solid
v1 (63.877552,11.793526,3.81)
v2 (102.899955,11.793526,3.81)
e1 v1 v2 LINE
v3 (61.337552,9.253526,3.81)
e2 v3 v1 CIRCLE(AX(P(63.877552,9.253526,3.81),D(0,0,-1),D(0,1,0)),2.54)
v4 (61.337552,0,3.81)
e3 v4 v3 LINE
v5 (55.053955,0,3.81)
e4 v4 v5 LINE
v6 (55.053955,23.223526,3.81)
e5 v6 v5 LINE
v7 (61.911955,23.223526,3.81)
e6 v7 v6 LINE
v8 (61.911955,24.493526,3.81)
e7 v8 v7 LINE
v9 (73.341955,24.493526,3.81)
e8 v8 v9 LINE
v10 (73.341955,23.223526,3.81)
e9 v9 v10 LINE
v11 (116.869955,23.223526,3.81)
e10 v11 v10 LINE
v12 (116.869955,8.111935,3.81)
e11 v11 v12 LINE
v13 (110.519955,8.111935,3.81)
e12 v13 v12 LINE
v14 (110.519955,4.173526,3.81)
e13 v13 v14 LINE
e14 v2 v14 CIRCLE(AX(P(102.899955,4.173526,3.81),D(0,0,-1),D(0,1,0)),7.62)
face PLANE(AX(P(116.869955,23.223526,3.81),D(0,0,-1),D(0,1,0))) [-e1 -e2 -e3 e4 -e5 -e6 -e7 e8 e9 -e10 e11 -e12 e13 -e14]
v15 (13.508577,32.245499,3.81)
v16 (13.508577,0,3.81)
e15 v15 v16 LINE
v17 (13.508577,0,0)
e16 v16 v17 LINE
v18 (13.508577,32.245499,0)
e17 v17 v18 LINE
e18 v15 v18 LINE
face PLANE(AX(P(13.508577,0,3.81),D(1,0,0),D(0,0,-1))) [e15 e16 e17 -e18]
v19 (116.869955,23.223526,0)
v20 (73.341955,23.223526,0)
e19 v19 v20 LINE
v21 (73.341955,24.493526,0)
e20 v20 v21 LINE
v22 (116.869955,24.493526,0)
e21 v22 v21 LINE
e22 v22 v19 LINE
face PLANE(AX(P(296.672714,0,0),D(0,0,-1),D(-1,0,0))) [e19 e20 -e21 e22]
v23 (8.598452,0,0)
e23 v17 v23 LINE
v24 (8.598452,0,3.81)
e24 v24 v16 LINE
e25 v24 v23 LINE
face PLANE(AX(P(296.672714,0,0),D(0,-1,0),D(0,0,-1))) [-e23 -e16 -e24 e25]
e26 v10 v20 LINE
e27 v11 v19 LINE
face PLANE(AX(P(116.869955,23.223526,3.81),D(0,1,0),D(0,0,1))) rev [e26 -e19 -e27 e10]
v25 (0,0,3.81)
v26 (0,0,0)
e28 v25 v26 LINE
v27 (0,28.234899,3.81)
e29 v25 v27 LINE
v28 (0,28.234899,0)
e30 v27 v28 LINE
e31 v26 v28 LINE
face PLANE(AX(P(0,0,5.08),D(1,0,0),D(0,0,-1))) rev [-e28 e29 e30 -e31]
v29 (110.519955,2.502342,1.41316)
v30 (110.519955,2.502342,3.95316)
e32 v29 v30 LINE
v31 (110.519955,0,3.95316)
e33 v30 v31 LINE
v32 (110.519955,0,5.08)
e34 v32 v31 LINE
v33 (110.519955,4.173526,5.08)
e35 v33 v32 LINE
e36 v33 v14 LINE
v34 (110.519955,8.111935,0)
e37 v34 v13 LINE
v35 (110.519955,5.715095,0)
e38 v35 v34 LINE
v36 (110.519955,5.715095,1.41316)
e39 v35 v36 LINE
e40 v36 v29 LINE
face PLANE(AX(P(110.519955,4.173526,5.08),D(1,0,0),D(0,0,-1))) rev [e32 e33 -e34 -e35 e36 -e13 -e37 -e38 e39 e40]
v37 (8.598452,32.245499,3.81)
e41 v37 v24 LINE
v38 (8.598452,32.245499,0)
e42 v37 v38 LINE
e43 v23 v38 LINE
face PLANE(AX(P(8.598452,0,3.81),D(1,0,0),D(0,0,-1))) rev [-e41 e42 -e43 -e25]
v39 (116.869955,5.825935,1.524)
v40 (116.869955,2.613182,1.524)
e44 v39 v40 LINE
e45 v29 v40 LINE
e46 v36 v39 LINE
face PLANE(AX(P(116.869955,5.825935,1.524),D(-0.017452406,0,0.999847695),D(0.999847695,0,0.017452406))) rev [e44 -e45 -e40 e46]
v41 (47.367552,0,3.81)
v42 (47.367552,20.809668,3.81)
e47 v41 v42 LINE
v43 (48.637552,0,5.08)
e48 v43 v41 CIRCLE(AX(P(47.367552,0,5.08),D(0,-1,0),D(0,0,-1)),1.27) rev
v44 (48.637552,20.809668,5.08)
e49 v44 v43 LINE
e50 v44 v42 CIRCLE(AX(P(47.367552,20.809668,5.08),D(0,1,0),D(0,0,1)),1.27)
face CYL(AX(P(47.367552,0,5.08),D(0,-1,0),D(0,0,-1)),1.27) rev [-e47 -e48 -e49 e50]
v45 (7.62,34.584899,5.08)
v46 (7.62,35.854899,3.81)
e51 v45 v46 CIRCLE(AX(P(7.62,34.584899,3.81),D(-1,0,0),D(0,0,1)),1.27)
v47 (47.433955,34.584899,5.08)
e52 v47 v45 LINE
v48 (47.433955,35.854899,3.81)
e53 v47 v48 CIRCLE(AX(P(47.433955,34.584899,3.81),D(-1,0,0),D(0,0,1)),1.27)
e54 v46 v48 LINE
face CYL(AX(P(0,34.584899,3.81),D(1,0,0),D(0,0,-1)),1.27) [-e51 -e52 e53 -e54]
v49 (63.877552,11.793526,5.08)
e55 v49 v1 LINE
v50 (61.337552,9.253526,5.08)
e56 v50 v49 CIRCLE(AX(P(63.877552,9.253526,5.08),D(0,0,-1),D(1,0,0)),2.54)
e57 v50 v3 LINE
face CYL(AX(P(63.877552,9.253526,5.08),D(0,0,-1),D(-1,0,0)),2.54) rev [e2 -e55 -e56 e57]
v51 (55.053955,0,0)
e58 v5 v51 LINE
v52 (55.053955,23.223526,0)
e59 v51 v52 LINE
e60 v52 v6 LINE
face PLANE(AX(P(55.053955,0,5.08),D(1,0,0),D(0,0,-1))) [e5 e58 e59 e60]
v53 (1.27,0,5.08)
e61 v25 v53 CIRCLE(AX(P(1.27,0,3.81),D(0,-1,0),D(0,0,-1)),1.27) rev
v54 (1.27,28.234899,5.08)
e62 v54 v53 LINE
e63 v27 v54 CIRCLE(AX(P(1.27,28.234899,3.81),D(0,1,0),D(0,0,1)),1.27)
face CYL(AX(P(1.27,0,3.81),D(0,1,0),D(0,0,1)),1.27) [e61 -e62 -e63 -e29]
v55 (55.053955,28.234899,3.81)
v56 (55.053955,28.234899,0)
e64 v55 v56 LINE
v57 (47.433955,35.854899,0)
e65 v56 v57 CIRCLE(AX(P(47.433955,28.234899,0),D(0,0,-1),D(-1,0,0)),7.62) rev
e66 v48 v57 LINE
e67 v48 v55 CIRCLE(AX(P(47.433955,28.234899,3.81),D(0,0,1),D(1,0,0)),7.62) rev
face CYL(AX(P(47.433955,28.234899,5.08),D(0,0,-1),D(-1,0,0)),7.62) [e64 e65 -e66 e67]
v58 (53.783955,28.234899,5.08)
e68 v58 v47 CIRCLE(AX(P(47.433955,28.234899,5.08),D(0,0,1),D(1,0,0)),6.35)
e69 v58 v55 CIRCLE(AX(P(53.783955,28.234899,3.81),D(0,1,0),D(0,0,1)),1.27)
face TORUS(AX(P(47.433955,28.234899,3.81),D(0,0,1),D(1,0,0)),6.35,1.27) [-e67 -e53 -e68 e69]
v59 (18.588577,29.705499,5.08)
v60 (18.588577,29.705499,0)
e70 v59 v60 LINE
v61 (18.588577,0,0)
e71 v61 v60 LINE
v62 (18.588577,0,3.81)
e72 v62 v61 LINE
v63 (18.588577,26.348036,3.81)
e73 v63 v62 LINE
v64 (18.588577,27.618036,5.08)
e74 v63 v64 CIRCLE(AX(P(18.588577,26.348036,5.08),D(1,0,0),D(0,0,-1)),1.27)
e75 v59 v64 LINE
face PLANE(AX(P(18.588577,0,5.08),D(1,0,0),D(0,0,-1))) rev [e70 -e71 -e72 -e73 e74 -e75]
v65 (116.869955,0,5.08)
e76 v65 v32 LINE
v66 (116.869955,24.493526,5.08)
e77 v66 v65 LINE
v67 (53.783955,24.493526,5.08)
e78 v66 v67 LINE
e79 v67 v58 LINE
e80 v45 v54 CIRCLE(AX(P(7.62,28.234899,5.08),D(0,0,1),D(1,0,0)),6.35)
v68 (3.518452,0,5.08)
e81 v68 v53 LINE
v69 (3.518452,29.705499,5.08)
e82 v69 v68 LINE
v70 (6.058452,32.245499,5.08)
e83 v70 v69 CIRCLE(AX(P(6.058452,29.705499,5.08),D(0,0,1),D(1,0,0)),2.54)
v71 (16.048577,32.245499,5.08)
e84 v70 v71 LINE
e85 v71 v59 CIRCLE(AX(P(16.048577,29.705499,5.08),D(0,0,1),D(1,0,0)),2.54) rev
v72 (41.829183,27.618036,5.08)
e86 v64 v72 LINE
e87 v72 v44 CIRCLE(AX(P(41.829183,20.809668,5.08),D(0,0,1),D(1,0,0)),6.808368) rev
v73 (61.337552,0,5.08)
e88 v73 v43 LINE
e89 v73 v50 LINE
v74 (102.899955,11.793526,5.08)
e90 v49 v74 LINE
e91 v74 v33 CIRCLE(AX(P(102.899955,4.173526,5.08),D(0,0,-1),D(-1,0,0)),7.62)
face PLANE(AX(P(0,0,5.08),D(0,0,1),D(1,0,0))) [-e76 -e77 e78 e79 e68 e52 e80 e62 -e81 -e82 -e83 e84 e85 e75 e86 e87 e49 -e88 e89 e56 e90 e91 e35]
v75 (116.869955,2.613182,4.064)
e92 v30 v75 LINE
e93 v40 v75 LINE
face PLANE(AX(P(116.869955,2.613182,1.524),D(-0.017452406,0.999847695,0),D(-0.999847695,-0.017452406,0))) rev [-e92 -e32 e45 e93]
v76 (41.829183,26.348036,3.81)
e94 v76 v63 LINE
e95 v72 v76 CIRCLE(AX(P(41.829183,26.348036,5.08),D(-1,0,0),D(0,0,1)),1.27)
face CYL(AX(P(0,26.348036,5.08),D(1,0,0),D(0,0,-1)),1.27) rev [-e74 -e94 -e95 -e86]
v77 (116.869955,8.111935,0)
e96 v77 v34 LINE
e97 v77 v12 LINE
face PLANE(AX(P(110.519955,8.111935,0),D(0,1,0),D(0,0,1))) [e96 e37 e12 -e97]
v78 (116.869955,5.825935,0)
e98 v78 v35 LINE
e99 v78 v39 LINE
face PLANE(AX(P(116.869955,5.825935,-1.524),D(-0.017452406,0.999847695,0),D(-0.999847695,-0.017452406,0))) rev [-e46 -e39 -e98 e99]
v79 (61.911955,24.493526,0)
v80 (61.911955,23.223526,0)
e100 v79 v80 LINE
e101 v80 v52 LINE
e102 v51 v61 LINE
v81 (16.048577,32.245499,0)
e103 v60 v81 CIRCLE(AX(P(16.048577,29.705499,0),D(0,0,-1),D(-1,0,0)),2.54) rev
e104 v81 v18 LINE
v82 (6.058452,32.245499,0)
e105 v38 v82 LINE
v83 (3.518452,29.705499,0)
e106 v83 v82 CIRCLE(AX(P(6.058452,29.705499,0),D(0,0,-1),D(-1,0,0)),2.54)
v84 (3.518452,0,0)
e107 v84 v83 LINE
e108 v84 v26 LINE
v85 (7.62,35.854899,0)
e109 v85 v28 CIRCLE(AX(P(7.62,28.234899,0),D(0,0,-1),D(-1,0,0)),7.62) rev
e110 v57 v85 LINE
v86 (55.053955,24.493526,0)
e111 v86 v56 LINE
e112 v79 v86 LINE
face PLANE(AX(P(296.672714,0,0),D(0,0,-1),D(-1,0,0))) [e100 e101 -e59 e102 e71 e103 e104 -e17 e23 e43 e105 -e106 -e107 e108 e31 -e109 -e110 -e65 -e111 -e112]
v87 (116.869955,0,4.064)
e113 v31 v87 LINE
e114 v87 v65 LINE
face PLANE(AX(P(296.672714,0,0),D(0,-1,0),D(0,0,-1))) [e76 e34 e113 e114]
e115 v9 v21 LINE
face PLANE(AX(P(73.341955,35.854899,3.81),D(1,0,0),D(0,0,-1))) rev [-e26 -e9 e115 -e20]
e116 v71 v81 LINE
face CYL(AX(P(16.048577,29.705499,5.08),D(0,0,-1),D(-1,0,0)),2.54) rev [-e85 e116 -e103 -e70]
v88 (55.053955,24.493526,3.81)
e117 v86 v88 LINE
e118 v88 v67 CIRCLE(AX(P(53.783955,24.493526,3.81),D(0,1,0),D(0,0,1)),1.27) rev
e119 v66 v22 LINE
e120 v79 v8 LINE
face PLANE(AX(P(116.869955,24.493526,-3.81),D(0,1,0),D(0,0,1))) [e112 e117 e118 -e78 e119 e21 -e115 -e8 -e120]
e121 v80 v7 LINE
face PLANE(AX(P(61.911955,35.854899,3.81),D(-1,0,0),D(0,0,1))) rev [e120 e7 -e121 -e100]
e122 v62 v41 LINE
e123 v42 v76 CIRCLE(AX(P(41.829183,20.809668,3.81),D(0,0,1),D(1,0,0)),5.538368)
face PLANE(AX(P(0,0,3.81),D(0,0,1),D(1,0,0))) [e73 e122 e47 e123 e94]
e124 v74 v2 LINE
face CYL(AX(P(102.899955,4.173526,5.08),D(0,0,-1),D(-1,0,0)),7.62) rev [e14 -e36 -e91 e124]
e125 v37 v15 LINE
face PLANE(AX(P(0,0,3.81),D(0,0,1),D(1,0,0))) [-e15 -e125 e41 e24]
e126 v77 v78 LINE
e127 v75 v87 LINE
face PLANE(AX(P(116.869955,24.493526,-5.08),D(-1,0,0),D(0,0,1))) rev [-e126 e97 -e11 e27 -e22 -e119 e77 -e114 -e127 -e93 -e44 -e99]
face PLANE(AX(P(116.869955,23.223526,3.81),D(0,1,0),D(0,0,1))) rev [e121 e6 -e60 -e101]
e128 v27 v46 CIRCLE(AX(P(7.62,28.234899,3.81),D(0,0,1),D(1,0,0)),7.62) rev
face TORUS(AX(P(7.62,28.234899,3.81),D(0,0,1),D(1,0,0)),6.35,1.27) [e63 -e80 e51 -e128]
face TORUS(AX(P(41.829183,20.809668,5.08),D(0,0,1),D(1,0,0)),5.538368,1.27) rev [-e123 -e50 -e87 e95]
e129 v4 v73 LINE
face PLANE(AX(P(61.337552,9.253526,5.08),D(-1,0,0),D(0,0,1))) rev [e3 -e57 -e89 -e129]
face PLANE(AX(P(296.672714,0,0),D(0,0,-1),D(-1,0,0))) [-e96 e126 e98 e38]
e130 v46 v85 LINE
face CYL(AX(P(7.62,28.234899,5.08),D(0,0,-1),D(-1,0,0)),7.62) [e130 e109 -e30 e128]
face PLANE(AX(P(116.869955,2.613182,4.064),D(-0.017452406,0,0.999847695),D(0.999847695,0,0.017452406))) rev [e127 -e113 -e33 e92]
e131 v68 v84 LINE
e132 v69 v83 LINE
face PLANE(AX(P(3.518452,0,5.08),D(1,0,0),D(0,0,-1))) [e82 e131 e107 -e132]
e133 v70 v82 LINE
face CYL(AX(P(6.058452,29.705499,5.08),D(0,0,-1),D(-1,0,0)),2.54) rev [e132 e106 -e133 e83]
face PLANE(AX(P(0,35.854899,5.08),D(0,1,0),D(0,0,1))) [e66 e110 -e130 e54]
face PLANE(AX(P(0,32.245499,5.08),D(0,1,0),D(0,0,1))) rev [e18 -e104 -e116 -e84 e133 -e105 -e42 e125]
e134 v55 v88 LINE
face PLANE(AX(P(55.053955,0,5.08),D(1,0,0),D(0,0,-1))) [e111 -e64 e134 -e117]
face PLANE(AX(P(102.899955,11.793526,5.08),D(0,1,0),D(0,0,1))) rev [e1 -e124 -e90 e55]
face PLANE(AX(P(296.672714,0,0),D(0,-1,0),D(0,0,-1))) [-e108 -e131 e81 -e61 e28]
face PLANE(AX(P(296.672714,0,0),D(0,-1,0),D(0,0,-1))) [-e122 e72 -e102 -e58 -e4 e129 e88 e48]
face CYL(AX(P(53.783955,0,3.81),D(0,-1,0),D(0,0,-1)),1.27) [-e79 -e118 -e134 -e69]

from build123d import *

# Parameters (mm, degrees)
EXTRUDE1_DEPTH           = 5.08
EXTRUDE2_DEPTH           = 1.27
EXTRUDE3_DEPTH           = 3.81
SKETCH1_5_W              = 4.91012523
SKETCH1_5_H              = 32.245498845
EXTRUDE4_DEPTH           = 3.81
FILLET2_R                = 1.27
FILLET3_R                = 1.27
SKETCH3_W                = 7.62
SKETCH3_H                = 71.709798158
CUT_EXTRUDE1_DEPTH       = 69.436
EXTRUDE_THIN4_DEPTH      = 61.816
EXTRUDE_THIN4_DEPTH_BACK = 5.08
SKETCH3_4_W              = 10.16
SKETCH3_4_H              = 48.987051728
SKETCH3_4_W_2            = 7.62
SKETCH3_4_H_2            = 46.447051728
CUT_EXTRUDE2_DEPTH       = 132.052100446
CUT_EXTRUDE2_DEPTH_BACK  = 132.052100446
SKETCH4_W                = 11.43
SKETCH4_H                = 7.62
CUT_EXTRUDE3_DEPTH       = 123.667785998
EXTRUDE7_START           = -6.35
EXTRUDE7_DEPTH           = 6.35
CUT_EXTRUDE4_DEPTH       = 6.35
CUT_EXTRUDE4_DRAFT       = -1
CUT_EXTRUDE5_DEPTH       = 123.351814538
CUT_EXTRUDE5_DEPTH_BACK  = 123.351814538


# Read off the part's stored shape, not the designer's step: Extrude7
with BuildPart() as part:
    # Sketch1 → Extrude1 (new, symmetric)
    with BuildSketch(Plane.XY):
        with BuildLine():
            Line((55.053954756, 23.223525864), (55.053954756, 28.234899079))
            ThreePointArc((55.053954756, 28.234899079), (52.822108428, 33.623052752), (47.433954756, 35.854899079))
            Line((47.433954756, 35.854899079), (7.62, 35.854899079))
            ThreePointArc((7.62, 35.854899079), (2.231846327, 33.623052752), (0, 28.234899079))
            Line((0, 28.234899079), (0, -28.234899079))
            ThreePointArc((0, -28.234899079), (2.231846327, -33.623052752), (7.62, -35.854899079))
            Line((7.62, -35.854899079), (47.433954756, -35.854899079))
            ThreePointArc((47.433954756, -35.854899079), (52.822108428, -33.623052752), (55.053954756, -28.234899079))
            Line((55.053954756, -28.234899079), (55.053954756, -23.223525864))
            Line((55.053954756, -23.223525864), (55.053954756, -19.324782682))
            Line((55.053954756, -19.324782682), (55.053954756, -16.240810389))
            Line((55.053954756, -16.240810389), (55.053954756, -5.571934871))
            Line((55.053954756, -5.571934871), (55.053954756, -2.359181621))
            Line((55.053954756, -2.359181621), (55.053954756, 2.359181621))
            Line((55.053954756, 2.359181621), (55.053954756, 5.571934871))
            Line((55.053954756, 5.571934871), (55.053954756, 16.240810389))
            Line((55.053954756, 16.240810389), (55.053954756, 19.324782682))
            Line((55.053954756, 19.324782682), (55.053954756, 23.223525864))
        make_face()
        with BuildLine():
            ThreePointArc((16.048576777, 32.245498845), (17.844628001, 31.501550069), (18.588576777, 29.705498845))
            Line((18.588576777, 29.705498845), (18.588576777, 27.618036038))
            Line((18.588576777, 27.618036038), (41.829183295, 27.618036038))
            ThreePointArc((41.829183295, 27.618036038), (46.643426698, 25.623911128), (48.637551607, 20.809667725))
            Line((48.637551607, 20.809667725), (48.637551607, -20.809667725))
            ThreePointArc((48.637551607, -20.809667725), (46.643426698, -25.623911128), (41.829183295, -27.618036038))
            Line((41.829183295, -27.618036038), (18.588576777, -27.618036038))
            Line((18.588576777, -27.618036038), (18.588576777, -29.705498845))
            ThreePointArc((18.588576777, -29.705498845), (17.844628001, -31.501550069), (16.048576777, -32.245498845))
            Line((16.048576777, -32.245498845), (13.508576777, -32.245498845))
            Line((13.508576777, -32.245498845), (8.598451547, -32.245498845))
            Line((8.598451547, -32.245498845), (6.058451547, -32.245498845))
            ThreePointArc((6.058451547, -32.245498845), (4.262400322, -31.501550069), (3.518451547, -29.705498845))
            Line((3.518451547, -29.705498845), (3.518451547, 29.705498845))
            ThreePointArc((3.518451547, 29.705498845), (4.262400322, 31.501550069), (6.058451547, 32.245498845))
            Line((6.058451547, 32.245498845), (8.598451547, 32.245498845))
            Line((8.598451547, 32.245498845), (13.508576777, 32.245498845))
            Line((13.508576777, 32.245498845), (16.048576777, 32.245498845))
        make_face(mode=Mode.SUBTRACT)
    extrude(amount=EXTRUDE1_DEPTH, both=True)

    # Sketch1<3> → Extrude2 (add, symmetric)
    with BuildSketch(Plane.XY):
        Polygon((110.911701022, 19.324782682), (55.053954756, 19.324782682), (55.053954756, 16.240810389), (107.354901489, 16.240810389), align=None)
        Polygon((114.44157437, -2.359181621), (55.053954756, -2.359181621), (55.053954756, -5.571934871), (107.985089149, -5.571934871), align=None)
        Polygon((107.985089149, 5.571934871), (55.053954756, 5.571934871), (55.053954756, 2.359181621), (114.44157437, 2.359181621), align=None)
        Polygon((107.354901489, -16.240810389), (55.053954756, -16.240810389), (55.053954756, -19.324782682), (110.911701022, -19.324782682), align=None)
    extrude(amount=EXTRUDE2_DEPTH, both=True)

    # Sketch1<4> → Extrude3 (add, symmetric)
    with BuildSketch(Plane.XY):
        with BuildLine():
            Line((99.162437765, 23.223525864), (55.053954756, 23.223525864))
            Line((55.053954756, 23.223525864), (55.053954756, 19.324782682))
            Line((55.053954756, 19.324782682), (110.911701022, 19.324782682))
            ThreePointArc((110.911701022, 19.324782682), (111.567818322, 19.699285472), (111.579007121, 20.454677463))
            Line((111.579007121, 20.454677463), (109.51169598, 24.204470623))
            ThreePointArc((109.51169598, 24.204470623), (105.172136608, 28.674517094), (99.162437765, 30.316653142))
            Line((99.162437765, 30.316653142), (99.162437765, 23.223525864))
        make_face()
        Polygon((114.44157437, 2.359181621), (55.053954756, 2.359181621), (55.053954756, -2.359181621), (114.44157437, -2.359181621), (117.074513308, -1.049028675), (117.074513308, 1.049028675), align=None)
        with BuildLine():
            Line((55.053954756, -19.324782682), (55.053954756, -23.223525864))
            Line((55.053954756, -23.223525864), (99.162437765, -23.223525864))
            Line((99.162437765, -23.223525864), (99.162437765, -30.316653142))
            ThreePointArc((99.162437765, -30.316653142), (105.172136608, -28.674517094), (109.51169598, -24.204470623))
            Line((109.51169598, -24.204470623), (111.579007121, -20.454677463))
            ThreePointArc((111.579007121, -20.454677463), (111.567818322, -19.699285472), (110.911701022, -19.324782682))
            Line((110.911701022, -19.324782682), (55.053954756, -19.324782682))
        make_face()
    extrude(amount=EXTRUDE3_DEPTH, both=True)

    # Sketch1<5> → Extrude4 (add, symmetric)
    with BuildSketch(Plane.XY):
        with BuildLine():
            Line((48.637551607, 0), (18.588576777, 0))
            Line((18.588576777, 0), (18.588576777, -27.618036038))
            Line((18.588576777, -27.618036038), (41.829183295, -27.618036038))
            ThreePointArc((41.829183295, -27.618036038), (46.643426698, -25.623911128), (48.637551607, -20.809667725))
            Line((48.637551607, -20.809667725), (48.637551607, 0))
        make_face()
        with BuildLine():
            Line((18.588576777, 27.618036038), (18.588576777, 0))
            Line((18.588576777, 0), (48.637551607, 0))
            Line((48.637551607, 0), (48.637551607, 20.809667725))
            ThreePointArc((48.637551607, 20.809667725), (46.643426698, 25.623911128), (41.829183295, 27.618036038))
            Line((41.829183295, 27.618036038), (18.588576777, 27.618036038))
        make_face()
        with Locations((11.053514162, -16.122749423)):
            Rectangle(SKETCH1_5_W, SKETCH1_5_H)
        with Locations((11.053514162, 16.122749423)):
            Rectangle(SKETCH1_5_W, SKETCH1_5_H)
    extrude(amount=EXTRUDE4_DEPTH, both=True)

    # Fillet2
    fillet2_edges = [part.edges().sort_by_distance(p)[0] for p in [
        (30.208880036, -27.618036038, -3.81),
        (30.208880036, -27.618036038, 3.81),
        (46.643426698, -25.623911128, -3.81),
        (46.643426698, -25.623911128, 3.81),
        (48.637551607, 0, -3.81),
        (48.637551607, 0, 3.81),
        (46.643426698, 25.623911128, -3.81),
        (46.643426698, 25.623911128, 3.81),
        (30.208880036, 27.618036038, -3.81),
        (30.208880036, 27.618036038, 3.81),
    ]]
    fillet(fillet2_edges, radius=FILLET2_R - 0.0001)  # a hair under: the kernel refuses the full size

    # Fillet3
    fillet3_edges = [part.edges().sort_by_distance(p)[0] for p in [
        (2.231846327, 33.623052752, -5.08),
        (27.526977378, 35.854899079, -5.08),
        (52.822108428, 33.623052752, -5.08),
        (55.053954756, 0, -5.08),
        (52.822108428, -33.623052752, -5.08),
        (27.526977378, -35.854899079, -5.08),
        (2.231846327, -33.623052752, -5.08),
        (0, 0, -5.08),
        (0, 0, 5.08),
        (2.231846327, -33.623052752, 5.08),
        (27.526977378, -35.854899079, 5.08),
        (52.822108428, -33.623052752, 5.08),
        (55.053954756, 0, 5.08),
        (52.822108428, 33.623052752, 5.08),
        (27.526977378, 35.854899079, 5.08),
        (2.231846327, 33.623052752, 5.08),
    ]]
    fillet(fillet3_edges, radius=FILLET3_R - 0.0001)  # a hair under: the kernel refuses the full size

    # Sketch3 → Cut-Extrude1 (cut)
    with BuildSketch(Plane(origin=(55.053954756, 0, 0), x_dir=(0, 0, -1), z_dir=(1, 0, 0))):
        Rectangle(SKETCH3_W, SKETCH3_H)
    extrude(amount=CUT_EXTRUDE1_DEPTH, mode=Mode.SUBTRACT)

    # Sketch3<4> → Extrude-Thin4 (add, two sides: drawn at the far end of the back side and taken through both)
    with BuildSketch(Plane(origin=(55.053954756, 0, 0), x_dir=(0, 0, -1), z_dir=(1, 0, 0)).offset(-EXTRUDE_THIN4_DEPTH_BACK)):
        Rectangle(SKETCH3_4_W, SKETCH3_4_H)
        Rectangle(SKETCH3_4_W_2, SKETCH3_4_H_2, mode=Mode.SUBTRACT)
    extrude(amount=EXTRUDE_THIN4_DEPTH + EXTRUDE_THIN4_DEPTH_BACK)

    # Sketch4 → Cut-Extrude2 (cut, two sides: drawn at the far end of the back side and taken through both)
    with BuildSketch(Plane.XZ.offset(-23.223525864).offset(-CUT_EXTRUDE2_DEPTH_BACK)):
        with Locations((67.626954756, 0)):
            Rectangle(SKETCH4_W, SKETCH4_H)
    extrude(amount=CUT_EXTRUDE2_DEPTH + CUT_EXTRUDE2_DEPTH_BACK, mode=Mode.SUBTRACT)

    # Sketch5 → Cut-Extrude3 (cut, through all)
    with BuildSketch(Plane(origin=(0, 0, -5.08), x_dir=(-1, 0, 0), z_dir=(0, 0, -1))):
        with BuildLine():
            Line((-102.899954756, 11.793525864), (-63.877551607, 11.793525864))
            ThreePointArc((-63.877551607, 11.793525864), (-62.081500383, 11.049577089), (-61.337551607, 9.253525864))
            Line((-61.337551607, 9.253525864), (-61.337551607, -4.173525864))
            ThreePointArc((-61.337551607, -4.173525864), (-63.569397935, -9.561679537), (-68.957551607, -11.793525864))
            Line((-68.957551607, -11.793525864), (-107.979954756, -11.793525864))
            ThreePointArc((-107.979954756, -11.793525864), (-109.77600598, -11.049577089), (-110.519954756, -9.253525864))
            Line((-110.519954756, -9.253525864), (-110.519954756, 4.173525864))
            ThreePointArc((-110.519954756, 4.173525864), (-108.288108428, 9.561679537), (-102.899954756, 11.793525864))
        make_face()
    extrude(amount=-CUT_EXTRUDE3_DEPTH, mode=Mode.SUBTRACT)

    # Extrude7 outline → Extrude7 (add)
    with BuildSketch(Plane(origin=(116.869954756, 0, 0), x_dir=(0, 0, -1), z_dir=(1, 0, 0)).offset(EXTRUDE7_START)):
        Polygon((-1.27, 5.571934871), (1.27, 5.571934871), (1.27, 2.359181621), (3.81, 2.359181621), (3.81, 8.111934871), (-3.81, 8.111934871), (-3.81, 2.359181621), (-1.27, 2.359181621), align=None)
        Polygon((3.81, -8.111934871), (3.81, -2.359181621), (1.27, -2.359181621), (1.27, -5.571934871), (-1.27, -5.571934871), (-1.27, -2.359181621), (-3.81, -2.359181621), (-3.81, -8.111934871), align=None)
    extrude(amount=EXTRUDE7_DEPTH)


with BuildPart() as cut_extrude4_tool:
    # Sketch7 → Cut-Extrude4 (with draft: the straight prism first)
    with BuildSketch(Plane(origin=(116.869954756, 0, 0), x_dir=(0, 0, -1), z_dir=(1, 0, 0))):
        Polygon((-1.524, 2.613181621), (-4.064, 2.613181621), (-4.064, -2.613181621), (-1.524, -2.613181621), (-1.524, -5.825934871), (1.524, -5.825934871), (1.524, -2.613181621), (4.064, -2.613181621), (4.064, 2.613181621), (1.524, 2.613181621), (1.524, 5.825934871), (-1.524, 5.825934871), align=None)
    extrude(amount=-CUT_EXTRUDE4_DEPTH)
    # Cut-Extrude4: the draft: its side faces are tilted about the plane it starts from
    cut_extrude4_sides = [cut_extrude4_tool.faces().sort_by_distance(p)[0] for p in [
        (113.694954756, 2.613181621, 2.794),
        (113.694954756, 0, 4.064),
        (113.694954756, -2.613181621, 2.794),
        (113.694954756, -4.219558246, 1.524),
        (113.694954756, -5.825934871, 0),
        (113.694954756, -4.219558246, -1.524),
        (113.694954756, -2.613181621, -2.794),
        (113.694954756, 0, -4.064),
        (113.694954756, 2.613181621, -2.794),
        (113.694954756, 4.219558246, -1.524),
        (113.694954756, 5.825934871, 0),
        (113.694954756, 4.219558246, 1.524),
    ]]
    draft(cut_extrude4_sides, Plane(origin=(116.869954756, 0, 0), x_dir=(0, 0, -1), z_dir=(1, 0, 0)), CUT_EXTRUDE4_DRAFT)


with BuildPart() as part_1:
    add(part.part)

    # Cut-Extrude4: cut by cut_extrude4_tool
    add(cut_extrude4_tool.part, mode=Mode.SUBTRACT)

    # Sketch8 → Cut-Extrude5 (cut, two sides: drawn at the far end of the back side and taken through both)
    with BuildSketch(Plane(origin=(116.869954756, 0, 0), x_dir=(0, 0, -1), z_dir=(1, 0, 0)).offset(-CUT_EXTRUDE5_DEPTH_BACK)):
        Polygon((-158.859018875, 0), (-5.08, 0), (0, 0), (0, 35.854899079), (0, 189.633917954), (235.763888228, -7.868830363), (76.904869352, -197.502748317), align=None)
    extrude(amount=CUT_EXTRUDE5_DEPTH + CUT_EXTRUDE5_DEPTH_BACK, mode=Mode.SUBTRACT)


solid = part_1.part
